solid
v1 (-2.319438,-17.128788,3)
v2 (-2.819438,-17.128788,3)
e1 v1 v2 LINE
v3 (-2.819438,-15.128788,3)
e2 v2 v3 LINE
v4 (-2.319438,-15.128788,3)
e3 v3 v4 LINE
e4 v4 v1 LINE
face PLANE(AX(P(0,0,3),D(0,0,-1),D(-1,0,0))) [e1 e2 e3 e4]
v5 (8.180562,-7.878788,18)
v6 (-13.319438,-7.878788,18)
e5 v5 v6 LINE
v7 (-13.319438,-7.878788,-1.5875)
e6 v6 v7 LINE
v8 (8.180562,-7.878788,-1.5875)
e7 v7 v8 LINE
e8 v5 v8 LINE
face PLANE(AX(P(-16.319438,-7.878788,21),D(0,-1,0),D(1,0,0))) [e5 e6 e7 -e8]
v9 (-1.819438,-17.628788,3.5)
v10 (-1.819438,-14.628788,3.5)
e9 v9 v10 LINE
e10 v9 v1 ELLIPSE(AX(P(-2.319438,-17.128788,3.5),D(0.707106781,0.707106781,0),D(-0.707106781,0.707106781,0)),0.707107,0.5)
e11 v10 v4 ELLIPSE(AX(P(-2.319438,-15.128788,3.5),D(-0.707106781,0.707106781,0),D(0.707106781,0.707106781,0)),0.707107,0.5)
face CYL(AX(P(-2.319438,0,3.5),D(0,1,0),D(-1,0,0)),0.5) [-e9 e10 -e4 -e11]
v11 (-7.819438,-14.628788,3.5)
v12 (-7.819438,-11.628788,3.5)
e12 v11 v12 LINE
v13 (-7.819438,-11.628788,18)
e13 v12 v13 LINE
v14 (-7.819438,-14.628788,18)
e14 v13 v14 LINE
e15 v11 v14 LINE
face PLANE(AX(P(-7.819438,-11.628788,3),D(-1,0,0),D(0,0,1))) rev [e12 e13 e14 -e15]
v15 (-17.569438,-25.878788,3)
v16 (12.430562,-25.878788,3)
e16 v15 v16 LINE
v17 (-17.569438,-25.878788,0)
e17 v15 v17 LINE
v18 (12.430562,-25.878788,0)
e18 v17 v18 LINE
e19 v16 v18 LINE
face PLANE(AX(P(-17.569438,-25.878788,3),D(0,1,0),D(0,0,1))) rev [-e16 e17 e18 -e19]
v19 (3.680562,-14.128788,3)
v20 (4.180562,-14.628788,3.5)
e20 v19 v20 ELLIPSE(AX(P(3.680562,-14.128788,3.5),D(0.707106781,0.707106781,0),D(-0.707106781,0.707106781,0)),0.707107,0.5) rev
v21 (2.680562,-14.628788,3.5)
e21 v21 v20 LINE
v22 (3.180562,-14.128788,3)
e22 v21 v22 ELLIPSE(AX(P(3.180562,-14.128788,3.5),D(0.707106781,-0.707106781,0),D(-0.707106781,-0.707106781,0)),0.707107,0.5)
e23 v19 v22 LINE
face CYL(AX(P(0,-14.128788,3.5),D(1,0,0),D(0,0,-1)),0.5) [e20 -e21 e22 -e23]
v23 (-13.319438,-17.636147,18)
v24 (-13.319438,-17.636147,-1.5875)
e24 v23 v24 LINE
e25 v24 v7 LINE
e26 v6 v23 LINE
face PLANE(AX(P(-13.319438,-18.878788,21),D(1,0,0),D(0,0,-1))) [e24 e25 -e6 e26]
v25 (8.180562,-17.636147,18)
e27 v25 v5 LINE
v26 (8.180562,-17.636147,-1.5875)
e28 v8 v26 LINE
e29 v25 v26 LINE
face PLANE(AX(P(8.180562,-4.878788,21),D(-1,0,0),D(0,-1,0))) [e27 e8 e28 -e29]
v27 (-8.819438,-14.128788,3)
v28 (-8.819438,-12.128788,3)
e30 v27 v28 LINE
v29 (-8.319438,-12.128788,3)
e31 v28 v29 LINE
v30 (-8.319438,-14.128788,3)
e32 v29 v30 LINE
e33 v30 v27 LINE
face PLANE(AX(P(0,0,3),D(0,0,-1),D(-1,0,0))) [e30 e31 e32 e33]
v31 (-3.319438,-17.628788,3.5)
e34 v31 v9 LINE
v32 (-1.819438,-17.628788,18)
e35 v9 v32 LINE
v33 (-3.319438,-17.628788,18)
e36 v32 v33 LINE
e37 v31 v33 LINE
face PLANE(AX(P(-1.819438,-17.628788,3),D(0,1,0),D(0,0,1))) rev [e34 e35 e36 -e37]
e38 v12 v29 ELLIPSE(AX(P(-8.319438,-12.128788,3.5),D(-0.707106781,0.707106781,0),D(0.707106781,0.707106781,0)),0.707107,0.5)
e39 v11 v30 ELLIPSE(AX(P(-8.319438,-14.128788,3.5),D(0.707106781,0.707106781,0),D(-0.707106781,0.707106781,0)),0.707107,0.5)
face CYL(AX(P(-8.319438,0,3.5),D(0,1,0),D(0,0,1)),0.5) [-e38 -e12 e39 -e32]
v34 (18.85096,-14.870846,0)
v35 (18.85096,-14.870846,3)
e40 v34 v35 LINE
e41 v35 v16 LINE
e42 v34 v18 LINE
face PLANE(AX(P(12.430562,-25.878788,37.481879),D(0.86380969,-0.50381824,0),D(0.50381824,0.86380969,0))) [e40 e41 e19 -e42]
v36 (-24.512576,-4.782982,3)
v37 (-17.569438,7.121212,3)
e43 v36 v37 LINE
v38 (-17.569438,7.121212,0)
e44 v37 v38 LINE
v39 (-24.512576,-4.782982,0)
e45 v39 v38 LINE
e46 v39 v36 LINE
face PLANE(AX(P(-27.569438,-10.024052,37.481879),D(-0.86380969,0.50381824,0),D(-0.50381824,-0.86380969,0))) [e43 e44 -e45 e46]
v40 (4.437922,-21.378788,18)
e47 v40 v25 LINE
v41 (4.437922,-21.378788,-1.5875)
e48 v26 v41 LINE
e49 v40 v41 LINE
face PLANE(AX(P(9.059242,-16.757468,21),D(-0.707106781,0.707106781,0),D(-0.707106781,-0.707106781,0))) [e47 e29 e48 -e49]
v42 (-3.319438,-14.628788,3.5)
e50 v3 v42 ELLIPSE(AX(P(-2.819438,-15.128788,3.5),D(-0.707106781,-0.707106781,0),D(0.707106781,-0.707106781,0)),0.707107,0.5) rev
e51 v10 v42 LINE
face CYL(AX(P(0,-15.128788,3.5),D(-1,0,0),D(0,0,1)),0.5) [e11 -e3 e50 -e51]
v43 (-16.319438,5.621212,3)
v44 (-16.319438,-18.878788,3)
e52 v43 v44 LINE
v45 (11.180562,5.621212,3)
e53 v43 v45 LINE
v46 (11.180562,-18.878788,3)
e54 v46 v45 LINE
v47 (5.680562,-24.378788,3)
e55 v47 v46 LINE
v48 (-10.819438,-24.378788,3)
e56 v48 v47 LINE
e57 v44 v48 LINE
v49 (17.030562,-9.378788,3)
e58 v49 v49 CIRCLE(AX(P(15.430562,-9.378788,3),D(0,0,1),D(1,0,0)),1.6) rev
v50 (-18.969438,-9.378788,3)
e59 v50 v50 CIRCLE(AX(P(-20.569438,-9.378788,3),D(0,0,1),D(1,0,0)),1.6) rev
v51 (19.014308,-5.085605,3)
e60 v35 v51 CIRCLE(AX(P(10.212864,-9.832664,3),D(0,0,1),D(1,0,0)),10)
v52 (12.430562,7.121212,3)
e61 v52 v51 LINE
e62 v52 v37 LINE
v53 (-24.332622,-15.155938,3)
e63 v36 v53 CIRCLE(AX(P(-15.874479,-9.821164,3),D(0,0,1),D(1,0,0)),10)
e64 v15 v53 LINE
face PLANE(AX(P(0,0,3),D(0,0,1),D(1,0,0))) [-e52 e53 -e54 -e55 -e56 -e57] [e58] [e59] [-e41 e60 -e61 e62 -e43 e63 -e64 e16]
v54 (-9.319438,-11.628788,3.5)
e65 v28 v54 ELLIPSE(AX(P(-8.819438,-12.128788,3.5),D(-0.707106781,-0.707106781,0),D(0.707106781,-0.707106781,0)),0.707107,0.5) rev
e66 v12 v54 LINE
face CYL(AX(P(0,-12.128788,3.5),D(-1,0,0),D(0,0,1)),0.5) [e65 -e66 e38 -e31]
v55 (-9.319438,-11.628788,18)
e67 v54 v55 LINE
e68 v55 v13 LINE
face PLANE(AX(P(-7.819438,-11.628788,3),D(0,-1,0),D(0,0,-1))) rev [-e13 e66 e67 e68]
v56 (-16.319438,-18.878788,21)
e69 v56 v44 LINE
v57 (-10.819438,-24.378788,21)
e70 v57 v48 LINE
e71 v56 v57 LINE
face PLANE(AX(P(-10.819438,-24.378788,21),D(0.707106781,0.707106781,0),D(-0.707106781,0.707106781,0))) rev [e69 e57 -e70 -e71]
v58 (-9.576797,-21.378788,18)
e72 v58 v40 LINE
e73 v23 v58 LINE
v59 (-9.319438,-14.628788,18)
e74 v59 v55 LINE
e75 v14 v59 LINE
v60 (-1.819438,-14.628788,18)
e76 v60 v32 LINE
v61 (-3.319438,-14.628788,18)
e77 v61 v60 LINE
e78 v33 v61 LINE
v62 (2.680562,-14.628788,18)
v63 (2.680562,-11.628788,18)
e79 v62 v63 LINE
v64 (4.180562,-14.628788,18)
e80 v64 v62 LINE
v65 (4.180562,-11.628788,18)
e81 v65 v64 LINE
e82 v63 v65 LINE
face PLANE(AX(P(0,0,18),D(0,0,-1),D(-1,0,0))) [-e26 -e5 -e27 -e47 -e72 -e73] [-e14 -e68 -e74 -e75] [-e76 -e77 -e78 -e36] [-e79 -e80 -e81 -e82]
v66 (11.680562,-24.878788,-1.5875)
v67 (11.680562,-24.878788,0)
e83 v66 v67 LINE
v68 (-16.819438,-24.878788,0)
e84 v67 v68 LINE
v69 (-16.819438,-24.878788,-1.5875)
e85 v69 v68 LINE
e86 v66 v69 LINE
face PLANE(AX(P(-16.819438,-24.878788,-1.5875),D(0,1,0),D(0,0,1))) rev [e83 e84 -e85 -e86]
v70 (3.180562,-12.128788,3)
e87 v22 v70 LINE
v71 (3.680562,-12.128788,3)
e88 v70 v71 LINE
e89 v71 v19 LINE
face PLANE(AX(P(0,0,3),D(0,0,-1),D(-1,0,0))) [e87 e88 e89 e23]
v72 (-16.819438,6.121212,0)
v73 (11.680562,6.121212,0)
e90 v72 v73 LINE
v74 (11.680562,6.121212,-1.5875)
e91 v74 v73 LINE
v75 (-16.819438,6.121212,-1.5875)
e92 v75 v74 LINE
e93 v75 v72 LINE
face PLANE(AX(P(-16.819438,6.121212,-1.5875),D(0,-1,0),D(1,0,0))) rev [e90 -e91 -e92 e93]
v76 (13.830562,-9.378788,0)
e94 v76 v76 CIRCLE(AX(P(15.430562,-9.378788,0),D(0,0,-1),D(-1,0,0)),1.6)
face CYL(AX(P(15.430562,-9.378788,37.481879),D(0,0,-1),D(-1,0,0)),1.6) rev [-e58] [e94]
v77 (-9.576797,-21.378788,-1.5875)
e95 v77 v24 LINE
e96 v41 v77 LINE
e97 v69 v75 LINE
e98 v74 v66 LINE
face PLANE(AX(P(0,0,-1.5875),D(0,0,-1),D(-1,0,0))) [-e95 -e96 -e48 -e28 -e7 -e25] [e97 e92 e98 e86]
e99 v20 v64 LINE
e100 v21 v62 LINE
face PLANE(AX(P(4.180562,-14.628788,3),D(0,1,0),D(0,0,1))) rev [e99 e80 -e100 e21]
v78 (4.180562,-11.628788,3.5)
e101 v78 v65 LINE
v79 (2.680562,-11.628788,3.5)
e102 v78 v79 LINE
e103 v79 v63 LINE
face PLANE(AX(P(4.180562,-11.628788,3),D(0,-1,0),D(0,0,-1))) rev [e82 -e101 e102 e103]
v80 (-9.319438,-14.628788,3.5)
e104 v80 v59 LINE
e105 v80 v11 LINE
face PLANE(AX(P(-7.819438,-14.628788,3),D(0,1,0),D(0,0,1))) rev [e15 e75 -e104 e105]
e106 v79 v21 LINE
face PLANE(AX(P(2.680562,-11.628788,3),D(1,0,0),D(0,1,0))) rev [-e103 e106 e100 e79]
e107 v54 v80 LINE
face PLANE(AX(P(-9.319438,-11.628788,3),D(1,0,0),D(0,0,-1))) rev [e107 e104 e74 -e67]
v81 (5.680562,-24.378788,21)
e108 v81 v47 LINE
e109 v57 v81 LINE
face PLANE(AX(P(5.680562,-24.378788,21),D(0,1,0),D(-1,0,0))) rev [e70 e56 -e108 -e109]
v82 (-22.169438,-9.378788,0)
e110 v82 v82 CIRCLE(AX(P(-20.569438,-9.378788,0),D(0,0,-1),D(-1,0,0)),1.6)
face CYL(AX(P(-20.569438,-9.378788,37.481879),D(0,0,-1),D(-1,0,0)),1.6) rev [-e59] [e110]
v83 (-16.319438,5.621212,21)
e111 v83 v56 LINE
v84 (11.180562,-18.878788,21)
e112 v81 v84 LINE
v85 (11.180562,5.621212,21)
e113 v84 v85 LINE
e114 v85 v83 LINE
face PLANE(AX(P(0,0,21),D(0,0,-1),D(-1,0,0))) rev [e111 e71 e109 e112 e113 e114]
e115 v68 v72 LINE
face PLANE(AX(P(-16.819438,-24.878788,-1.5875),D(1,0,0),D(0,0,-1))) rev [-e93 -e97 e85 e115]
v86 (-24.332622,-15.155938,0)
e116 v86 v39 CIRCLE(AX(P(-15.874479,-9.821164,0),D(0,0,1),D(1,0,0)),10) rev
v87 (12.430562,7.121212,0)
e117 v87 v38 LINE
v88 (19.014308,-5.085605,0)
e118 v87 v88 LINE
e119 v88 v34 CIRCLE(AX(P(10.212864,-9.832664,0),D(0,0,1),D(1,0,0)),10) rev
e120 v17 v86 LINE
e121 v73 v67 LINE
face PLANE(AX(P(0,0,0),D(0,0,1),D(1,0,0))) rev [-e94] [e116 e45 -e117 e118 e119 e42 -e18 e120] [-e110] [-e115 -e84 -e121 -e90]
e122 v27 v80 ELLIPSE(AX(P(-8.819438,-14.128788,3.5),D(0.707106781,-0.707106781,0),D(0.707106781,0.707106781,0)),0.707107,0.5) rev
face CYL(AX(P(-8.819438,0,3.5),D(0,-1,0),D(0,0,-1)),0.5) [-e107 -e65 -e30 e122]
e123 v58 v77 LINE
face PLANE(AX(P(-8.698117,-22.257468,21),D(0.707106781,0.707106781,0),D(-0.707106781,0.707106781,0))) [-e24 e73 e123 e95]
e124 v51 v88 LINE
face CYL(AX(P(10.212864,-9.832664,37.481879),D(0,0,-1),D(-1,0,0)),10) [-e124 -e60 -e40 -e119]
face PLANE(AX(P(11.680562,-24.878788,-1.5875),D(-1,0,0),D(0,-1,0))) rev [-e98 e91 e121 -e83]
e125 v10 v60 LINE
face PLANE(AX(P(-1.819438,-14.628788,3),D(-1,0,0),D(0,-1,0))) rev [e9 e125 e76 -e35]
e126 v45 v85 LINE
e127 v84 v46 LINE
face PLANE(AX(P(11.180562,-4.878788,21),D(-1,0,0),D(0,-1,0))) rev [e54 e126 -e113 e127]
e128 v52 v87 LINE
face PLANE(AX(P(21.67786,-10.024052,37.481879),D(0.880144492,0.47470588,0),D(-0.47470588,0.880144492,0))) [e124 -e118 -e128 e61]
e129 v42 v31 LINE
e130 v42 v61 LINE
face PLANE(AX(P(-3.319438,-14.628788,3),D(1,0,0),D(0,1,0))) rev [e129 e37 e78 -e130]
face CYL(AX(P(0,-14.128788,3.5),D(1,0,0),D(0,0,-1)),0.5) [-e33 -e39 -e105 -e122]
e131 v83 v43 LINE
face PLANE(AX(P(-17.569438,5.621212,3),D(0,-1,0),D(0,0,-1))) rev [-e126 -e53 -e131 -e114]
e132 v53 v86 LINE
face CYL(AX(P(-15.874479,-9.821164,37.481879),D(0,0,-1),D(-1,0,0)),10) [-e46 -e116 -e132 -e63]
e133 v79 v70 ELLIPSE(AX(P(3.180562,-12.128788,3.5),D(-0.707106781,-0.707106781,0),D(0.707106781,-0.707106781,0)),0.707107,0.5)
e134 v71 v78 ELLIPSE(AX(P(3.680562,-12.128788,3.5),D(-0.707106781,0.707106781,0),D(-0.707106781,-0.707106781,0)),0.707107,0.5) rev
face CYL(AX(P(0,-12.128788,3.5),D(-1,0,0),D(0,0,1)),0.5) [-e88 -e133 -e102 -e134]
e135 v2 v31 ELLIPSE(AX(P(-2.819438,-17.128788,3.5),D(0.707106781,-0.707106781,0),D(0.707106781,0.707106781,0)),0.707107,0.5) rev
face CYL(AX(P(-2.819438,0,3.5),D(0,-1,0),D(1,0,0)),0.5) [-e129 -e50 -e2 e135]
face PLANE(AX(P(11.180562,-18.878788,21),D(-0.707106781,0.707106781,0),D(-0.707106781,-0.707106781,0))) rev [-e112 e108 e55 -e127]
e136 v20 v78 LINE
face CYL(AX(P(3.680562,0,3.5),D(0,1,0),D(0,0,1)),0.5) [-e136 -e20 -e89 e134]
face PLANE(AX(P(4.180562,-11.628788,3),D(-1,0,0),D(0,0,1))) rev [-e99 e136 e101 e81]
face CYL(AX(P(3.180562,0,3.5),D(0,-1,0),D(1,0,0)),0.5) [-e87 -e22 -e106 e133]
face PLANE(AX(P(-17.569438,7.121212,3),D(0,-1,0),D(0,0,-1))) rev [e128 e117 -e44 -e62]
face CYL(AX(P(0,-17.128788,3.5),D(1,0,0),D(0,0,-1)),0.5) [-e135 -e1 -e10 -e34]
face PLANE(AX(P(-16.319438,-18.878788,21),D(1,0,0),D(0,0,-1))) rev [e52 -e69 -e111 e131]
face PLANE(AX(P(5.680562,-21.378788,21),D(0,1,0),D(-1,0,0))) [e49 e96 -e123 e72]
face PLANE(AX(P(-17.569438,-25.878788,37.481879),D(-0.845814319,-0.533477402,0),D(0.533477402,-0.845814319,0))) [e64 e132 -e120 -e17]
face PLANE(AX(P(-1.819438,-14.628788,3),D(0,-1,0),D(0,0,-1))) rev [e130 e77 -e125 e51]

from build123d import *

# Parameters (mm, degrees)
ESQUISSE1_W        = 30
ESQUISSE1_H        = 33
BOSS_EXTRU_1_DEPTH = 3
BOSS_EXTRU_2_DEPTH = 18
COQUE1_DEPTH       = 18
ESQUISSE3_W        = 1.5
ESQUISSE3_H        = 3
BOSS_EXTRU_3_DEPTH = 15
CONG_1_R           = 0.5
ESQUISSE4_W        = 27.5
ESQUISSE4_H        = 18
BOSS_EXTRU_4_DEPTH = 10.5
ESQUISSE6_R        = 1.6
BOSS_EXTRU_5_DEPTH = 3
CONG_2_R           = 10
ESQUISSE7_W        = 28.5
ESQUISSE7_H        = 31
BOSS_EXTRU_6_DEPTH = 1.5875


# Read off the part's stored shape, not the designer's step: Coque1
with BuildPart() as part:
    # Esquisse1 → Boss.-Extru.1 (new body)
    with BuildSketch(Plane.XY):
        with Locations((-2.569437515, -9.378787879)):
            Rectangle(ESQUISSE1_W, ESQUISSE1_H)
    extrude(amount=BOSS_EXTRU_1_DEPTH)

    # Esquisse2 → Boss.-Extru.2 (add)
    with BuildSketch(Plane.XY.offset(3)):
        Polygon((-16.319437515, -4.878787879), (11.180562485, -4.878787879), (11.180562485, -18.878787879), (5.680562485, -24.378787879), (-10.819437515, -24.378787879), (-16.319437515, -18.878787879), align=None)
    extrude(amount=BOSS_EXTRU_2_DEPTH)

    # Coque1 outline → Coque1 (cut)
    with BuildSketch(Plane.XY):
        Polygon((-13.319437515, -7.878787879), (-13.319437515, -17.636147192), (-9.576796827, -21.378787879), (4.437921798, -21.378787879), (8.180562485, -17.636147192), (8.180562485, -7.878787879), align=None)
    extrude(amount=COQUE1_DEPTH, mode=Mode.SUBTRACT)

    # Esquisse3 → Boss.-Extru.3 (add)
    with BuildSketch(Plane(origin=(0, 0, 18), x_dir=(-1, 0, 0), z_dir=(0, 0, -1))):
        with Locations((2.569437515, -16.128787879)):
            Rectangle(ESQUISSE3_W, ESQUISSE3_H)
        with Locations((-3.430562485, -13.128787879)):
            Rectangle(ESQUISSE3_W, ESQUISSE3_H)
        with Locations((8.569437515, -13.128787879)):
            Rectangle(ESQUISSE3_W, ESQUISSE3_H)
    extrude(amount=BOSS_EXTRU_3_DEPTH)

    # Congé1
    cong_1_edges = [part.edges().sort_by_distance(p)[0] for p in [
        (-1.819437515, -16.128787879, 3),
        (-2.569437515, -17.628787879, 3),
        (-3.319437515, -16.128787879, 3),
        (-2.569437515, -14.628787879, 3),
        (4.180562485, -13.128787879, 3),
        (3.430562485, -14.628787879, 3),
        (2.680562485, -13.128787879, 3),
        (3.430562485, -11.628787879, 3),
        (-7.819437515, -13.128787879, 3),
        (-8.569437515, -14.628787879, 3),
        (-9.319437515, -13.128787879, 3),
        (-8.569437515, -11.628787879, 3),
    ]]
    fillet(cong_1_edges, radius=CONG_1_R)

    # Esquisse4 → Boss.-Extru.4 (add)
    with BuildSketch(Plane(origin=(0, -4.878787879, 0), x_dir=(1, 0, 0), z_dir=(0, 1, 0))):
        with Locations((-2.569437515, -12)):
            Rectangle(ESQUISSE4_W, ESQUISSE4_H)
    extrude(amount=BOSS_EXTRU_4_DEPTH)

    # Esquisse6 → Boss.-Extru.5 (add)
    # profile 1 of 2: a face of its own
    with BuildSketch(Plane(origin=(0, 0, 0), x_dir=(-1, 0, 0), z_dir=(0, 0, -1))):
        Polygon((17.569437515, -25.878787879), (27.569437515, -10.024052208), (17.569437515, 7.121212121), align=None)
        with Locations((20.569437515, -9.378787879)):
            Circle(ESQUISSE6_R, mode=Mode.SUBTRACT)
    # profile 2 of 2: a face of its own
    with BuildSketch(Plane(origin=(0, 0, 0), x_dir=(-1, 0, 0), z_dir=(0, 0, -1))):
        Polygon((-12.430562485, 7.121212121), (-12.430562485, -25.878787879), (-21.677859795, -10.024052208), align=None)
        with Locations((-15.430562485, -9.378787879)):
            Circle(ESQUISSE6_R, mode=Mode.SUBTRACT)
    extrude(amount=-BOSS_EXTRU_5_DEPTH)

    # Congé2
    cong_2_edges = [part.edges().sort_by_distance(p)[0] for p in [
        (-27.569437515, -10.024052208, 1.5),
        (21.677859795, -10.024052208, 1.5),
    ]]
    fillet(cong_2_edges, radius=CONG_2_R)

    # Esquisse7 → Boss.-Extru.6 (add)
    with BuildSketch(Plane(origin=(0, 0, 0), x_dir=(-1, 0, 0), z_dir=(0, 0, -1))):
        with Locations((2.569437515, -9.378787879)):
            Rectangle(ESQUISSE7_W, ESQUISSE7_H)
        Polygon((-4.437921798, -21.378787879), (-8.180562485, -17.636147192), (-8.180562485, -7.878787879), (13.319437515, -7.878787879), (13.319437515, -17.636147192), (9.576796827, -21.378787879), align=None, mode=Mode.SUBTRACT)
    extrude(amount=BOSS_EXTRU_6_DEPTH)


solid = part.part
